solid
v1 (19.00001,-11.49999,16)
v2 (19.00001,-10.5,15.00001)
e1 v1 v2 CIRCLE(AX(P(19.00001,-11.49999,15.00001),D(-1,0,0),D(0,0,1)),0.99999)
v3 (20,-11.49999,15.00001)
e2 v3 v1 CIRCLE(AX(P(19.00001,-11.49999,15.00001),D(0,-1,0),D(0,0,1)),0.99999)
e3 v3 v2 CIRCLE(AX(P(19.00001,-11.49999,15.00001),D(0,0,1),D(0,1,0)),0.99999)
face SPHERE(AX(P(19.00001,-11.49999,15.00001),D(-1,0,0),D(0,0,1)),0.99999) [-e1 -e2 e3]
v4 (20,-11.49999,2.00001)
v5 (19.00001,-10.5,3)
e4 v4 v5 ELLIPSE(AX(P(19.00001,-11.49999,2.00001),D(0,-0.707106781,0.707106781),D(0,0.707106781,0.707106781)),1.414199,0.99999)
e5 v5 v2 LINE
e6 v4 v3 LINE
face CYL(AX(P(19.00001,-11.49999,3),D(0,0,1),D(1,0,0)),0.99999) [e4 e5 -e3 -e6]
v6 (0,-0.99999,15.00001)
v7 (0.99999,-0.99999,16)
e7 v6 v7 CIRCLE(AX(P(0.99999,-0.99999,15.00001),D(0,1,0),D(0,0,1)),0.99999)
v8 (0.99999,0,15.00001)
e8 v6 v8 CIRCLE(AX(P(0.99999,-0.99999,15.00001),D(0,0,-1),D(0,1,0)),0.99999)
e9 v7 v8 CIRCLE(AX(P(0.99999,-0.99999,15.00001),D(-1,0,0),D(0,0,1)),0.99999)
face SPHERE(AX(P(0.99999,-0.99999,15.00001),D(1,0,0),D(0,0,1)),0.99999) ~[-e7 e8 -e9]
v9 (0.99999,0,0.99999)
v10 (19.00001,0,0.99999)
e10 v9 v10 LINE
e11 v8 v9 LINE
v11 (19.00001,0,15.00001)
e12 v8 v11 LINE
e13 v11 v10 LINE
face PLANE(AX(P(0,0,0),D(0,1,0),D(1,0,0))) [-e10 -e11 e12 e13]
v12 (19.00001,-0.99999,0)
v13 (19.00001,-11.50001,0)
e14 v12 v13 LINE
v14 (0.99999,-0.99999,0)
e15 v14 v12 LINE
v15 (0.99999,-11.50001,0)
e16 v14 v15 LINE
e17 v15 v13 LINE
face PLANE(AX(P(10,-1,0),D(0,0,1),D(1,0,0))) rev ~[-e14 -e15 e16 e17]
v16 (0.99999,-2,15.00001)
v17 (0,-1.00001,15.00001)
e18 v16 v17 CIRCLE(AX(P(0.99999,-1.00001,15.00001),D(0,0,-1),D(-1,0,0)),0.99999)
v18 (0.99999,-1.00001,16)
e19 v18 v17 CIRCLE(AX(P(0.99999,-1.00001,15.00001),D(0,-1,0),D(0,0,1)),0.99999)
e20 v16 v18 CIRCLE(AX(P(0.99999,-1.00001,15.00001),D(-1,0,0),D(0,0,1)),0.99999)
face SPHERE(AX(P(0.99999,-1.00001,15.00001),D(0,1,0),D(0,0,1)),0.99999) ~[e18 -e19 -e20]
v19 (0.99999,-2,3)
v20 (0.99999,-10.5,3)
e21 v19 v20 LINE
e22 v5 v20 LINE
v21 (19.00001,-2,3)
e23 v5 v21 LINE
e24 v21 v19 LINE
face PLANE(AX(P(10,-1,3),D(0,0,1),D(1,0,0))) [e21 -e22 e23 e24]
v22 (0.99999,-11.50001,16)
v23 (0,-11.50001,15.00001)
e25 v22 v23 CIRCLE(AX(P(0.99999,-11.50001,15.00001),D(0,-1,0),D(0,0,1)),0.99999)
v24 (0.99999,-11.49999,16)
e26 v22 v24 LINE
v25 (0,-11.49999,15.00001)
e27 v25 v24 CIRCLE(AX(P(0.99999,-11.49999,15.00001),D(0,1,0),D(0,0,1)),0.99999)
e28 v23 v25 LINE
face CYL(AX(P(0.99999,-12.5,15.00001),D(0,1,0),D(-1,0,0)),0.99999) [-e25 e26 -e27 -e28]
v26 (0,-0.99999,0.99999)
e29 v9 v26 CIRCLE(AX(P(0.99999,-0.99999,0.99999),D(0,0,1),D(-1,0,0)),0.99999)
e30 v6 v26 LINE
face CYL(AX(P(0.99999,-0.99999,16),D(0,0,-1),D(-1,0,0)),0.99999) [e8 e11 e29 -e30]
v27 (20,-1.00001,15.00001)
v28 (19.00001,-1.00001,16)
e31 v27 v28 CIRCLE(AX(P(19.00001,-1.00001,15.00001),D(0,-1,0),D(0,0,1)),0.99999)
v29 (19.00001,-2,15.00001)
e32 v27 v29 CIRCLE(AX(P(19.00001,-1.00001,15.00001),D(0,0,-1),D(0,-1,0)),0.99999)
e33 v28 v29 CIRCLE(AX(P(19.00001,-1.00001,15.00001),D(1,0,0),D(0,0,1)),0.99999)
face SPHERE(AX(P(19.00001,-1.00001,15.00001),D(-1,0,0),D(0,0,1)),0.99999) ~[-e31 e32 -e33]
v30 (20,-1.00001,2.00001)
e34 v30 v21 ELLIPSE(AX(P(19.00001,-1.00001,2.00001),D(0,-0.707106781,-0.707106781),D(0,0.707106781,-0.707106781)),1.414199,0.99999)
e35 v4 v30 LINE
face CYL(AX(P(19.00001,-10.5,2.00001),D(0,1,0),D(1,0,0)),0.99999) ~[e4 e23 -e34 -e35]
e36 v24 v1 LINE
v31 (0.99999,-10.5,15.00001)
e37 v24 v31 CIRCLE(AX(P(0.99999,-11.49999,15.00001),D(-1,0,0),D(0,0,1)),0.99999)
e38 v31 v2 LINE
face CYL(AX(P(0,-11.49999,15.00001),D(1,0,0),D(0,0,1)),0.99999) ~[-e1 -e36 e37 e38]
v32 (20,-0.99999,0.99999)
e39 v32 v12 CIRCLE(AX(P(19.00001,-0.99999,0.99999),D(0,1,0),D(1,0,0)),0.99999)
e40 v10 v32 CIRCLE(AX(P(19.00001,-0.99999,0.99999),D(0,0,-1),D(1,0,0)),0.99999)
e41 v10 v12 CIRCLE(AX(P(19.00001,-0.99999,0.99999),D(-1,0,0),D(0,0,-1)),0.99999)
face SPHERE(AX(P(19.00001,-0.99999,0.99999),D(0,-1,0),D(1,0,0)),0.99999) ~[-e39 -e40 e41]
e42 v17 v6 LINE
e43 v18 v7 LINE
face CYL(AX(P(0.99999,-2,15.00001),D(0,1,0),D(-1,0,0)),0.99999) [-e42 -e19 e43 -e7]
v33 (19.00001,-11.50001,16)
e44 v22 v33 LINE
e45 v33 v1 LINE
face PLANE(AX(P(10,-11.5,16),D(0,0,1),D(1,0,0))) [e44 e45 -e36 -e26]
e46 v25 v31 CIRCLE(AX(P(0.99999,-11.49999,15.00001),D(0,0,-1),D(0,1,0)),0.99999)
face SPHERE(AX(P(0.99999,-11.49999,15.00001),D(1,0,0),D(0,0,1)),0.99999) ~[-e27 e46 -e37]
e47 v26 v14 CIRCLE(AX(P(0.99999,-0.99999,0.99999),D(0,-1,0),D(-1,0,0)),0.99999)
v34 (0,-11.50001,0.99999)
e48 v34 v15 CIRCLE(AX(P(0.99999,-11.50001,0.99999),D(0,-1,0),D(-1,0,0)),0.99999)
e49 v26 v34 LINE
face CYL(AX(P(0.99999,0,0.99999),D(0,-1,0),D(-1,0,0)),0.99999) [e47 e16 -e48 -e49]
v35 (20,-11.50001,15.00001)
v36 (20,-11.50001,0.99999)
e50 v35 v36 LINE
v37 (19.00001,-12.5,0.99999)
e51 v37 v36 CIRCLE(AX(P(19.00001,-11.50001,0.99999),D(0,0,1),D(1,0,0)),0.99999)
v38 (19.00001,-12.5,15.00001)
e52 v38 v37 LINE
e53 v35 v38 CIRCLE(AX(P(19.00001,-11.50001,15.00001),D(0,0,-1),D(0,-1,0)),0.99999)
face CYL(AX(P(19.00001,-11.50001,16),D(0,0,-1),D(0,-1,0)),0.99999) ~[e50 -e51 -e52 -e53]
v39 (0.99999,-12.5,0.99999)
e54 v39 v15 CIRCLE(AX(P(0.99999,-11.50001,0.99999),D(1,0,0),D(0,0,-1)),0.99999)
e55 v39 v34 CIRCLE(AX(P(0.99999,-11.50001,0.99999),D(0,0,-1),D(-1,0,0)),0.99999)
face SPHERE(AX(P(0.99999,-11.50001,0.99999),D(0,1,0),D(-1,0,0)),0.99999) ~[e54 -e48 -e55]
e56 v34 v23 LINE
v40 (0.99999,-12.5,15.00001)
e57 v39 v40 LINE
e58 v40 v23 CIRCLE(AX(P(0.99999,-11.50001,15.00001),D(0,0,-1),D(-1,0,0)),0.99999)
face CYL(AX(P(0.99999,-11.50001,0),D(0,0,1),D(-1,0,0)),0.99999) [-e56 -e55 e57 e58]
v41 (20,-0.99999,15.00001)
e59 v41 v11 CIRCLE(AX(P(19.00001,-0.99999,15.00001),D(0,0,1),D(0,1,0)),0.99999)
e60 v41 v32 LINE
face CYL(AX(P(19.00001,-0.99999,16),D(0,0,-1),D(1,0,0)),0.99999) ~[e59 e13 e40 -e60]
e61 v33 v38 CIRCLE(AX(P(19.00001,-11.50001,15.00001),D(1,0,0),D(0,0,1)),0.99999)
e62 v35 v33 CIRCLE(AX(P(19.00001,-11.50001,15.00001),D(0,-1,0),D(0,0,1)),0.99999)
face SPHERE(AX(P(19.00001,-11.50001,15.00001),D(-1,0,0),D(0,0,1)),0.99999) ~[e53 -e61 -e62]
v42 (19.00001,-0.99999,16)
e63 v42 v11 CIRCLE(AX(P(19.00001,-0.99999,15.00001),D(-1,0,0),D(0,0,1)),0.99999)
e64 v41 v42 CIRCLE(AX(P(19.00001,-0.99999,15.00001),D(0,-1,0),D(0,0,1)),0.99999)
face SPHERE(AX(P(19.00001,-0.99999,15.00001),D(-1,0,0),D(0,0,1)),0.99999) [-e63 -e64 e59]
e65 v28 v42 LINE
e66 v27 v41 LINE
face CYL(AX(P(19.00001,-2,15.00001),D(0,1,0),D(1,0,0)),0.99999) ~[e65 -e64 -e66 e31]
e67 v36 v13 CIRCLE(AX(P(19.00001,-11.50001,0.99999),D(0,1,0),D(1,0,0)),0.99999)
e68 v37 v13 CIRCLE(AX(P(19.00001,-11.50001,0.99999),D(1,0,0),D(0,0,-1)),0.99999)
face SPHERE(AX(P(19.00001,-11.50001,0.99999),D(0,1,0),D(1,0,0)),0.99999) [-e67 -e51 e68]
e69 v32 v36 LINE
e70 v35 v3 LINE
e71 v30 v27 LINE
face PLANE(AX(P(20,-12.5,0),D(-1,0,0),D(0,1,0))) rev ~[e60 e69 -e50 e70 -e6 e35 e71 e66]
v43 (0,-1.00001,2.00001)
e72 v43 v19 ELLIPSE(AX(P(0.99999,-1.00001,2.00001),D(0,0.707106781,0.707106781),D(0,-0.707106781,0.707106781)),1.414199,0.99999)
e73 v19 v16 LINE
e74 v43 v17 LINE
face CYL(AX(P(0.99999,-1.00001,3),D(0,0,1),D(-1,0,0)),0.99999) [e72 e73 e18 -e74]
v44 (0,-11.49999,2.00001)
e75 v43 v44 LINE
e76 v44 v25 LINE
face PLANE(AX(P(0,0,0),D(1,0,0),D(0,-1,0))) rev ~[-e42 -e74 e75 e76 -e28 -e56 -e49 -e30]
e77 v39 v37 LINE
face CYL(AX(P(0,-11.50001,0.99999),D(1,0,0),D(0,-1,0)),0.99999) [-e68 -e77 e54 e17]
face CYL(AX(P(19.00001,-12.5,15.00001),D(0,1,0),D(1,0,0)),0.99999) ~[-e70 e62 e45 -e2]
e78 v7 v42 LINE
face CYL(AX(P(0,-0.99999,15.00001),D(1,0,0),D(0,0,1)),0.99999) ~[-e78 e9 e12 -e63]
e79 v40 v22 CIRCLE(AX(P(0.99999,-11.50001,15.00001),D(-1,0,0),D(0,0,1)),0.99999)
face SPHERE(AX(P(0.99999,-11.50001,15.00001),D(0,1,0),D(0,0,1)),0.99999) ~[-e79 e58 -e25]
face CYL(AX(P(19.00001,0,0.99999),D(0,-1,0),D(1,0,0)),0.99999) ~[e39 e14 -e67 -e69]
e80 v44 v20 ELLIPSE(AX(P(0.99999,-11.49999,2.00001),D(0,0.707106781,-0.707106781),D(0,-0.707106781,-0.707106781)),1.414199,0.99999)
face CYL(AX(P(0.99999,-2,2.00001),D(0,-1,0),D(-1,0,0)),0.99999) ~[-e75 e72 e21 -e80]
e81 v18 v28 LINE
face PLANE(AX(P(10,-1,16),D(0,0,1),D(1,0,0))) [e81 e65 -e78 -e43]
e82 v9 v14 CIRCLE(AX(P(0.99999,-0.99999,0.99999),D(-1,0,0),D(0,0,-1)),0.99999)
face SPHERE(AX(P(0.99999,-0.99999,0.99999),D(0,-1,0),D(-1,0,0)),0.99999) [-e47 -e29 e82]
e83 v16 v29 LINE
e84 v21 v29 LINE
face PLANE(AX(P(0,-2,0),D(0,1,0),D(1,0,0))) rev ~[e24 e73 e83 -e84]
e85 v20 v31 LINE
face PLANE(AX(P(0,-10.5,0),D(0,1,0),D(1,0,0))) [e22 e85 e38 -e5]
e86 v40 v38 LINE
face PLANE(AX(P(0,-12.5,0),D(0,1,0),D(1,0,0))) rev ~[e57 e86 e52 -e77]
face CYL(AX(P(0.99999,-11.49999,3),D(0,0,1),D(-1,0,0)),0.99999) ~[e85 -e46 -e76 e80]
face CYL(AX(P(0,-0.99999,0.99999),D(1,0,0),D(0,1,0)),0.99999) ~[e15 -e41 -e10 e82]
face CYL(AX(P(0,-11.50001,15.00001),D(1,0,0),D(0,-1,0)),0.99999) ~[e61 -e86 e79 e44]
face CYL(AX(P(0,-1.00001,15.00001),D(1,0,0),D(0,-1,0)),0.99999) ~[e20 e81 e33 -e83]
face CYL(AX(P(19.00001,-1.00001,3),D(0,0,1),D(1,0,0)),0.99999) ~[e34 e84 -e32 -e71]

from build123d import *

# Parameters (mm, degrees)
F0_W     = 20
F0_H     = 2
F0_H_2   = 8.5
F1_DEPTH = 3
F2_DEPTH = 16
F3_R     = 0.99999


# Not quite as in the source:
# - a fillet or chamfer is up to 0.001 mm smaller than in the source, because OpenCascade refuses the exact size


with BuildPart() as f1:
    # F0 (on Top) → F1 (new body)
    with BuildSketch(Plane.XY):
        with Locations((10, -1)):
            Rectangle(F0_W, F0_H)
        with Locations((10, -6.25)):
            Rectangle(F0_W, F0_H_2)
        with Locations((10, -11.5)):
            Rectangle(F0_W, F0_H)
    extrude(amount=F1_DEPTH)

    # F0 (on Top) → F2 (join)
    with BuildSketch(Plane.XY):
        with Locations((10, -1)):
            Rectangle(F0_W, F0_H)
        with Locations((10, -11.5)):
            Rectangle(F0_W, F0_H)
    extrude(amount=F2_DEPTH)

    # F3 (radius 1 in the source; OpenCascade refuses exactly that, so slightly less here)
    f3_edges = [f1.edges().sort_by_distance(p)[0] for p in [
        (10, 0, 16),
        (0, -1, 16),
        (10, -2, 16),
        (20, -1, 16),
        (10, -10.5, 16),
        (0, -11.5, 16),
        (10, -12.5, 16),
        (20, -11.5, 16),
        (0, -6.25, 0),
        (0, 0, 8),
        (0, -2, 9.5),
        (0, -6.25, 3),
        (0, -10.5, 9.5),
        (0, -12.5, 8),
        (20, -6.25, 0),
        (20, -12.5, 8),
        (20, -10.5, 9.5),
        (20, -6.25, 3),
        (20, -2, 9.5),
        (20, 0, 8),
        (10, 0, 0),
        (10, -12.5, 0),
    ]]
    fillet(f3_edges, radius=F3_R)


solid = f1.part
